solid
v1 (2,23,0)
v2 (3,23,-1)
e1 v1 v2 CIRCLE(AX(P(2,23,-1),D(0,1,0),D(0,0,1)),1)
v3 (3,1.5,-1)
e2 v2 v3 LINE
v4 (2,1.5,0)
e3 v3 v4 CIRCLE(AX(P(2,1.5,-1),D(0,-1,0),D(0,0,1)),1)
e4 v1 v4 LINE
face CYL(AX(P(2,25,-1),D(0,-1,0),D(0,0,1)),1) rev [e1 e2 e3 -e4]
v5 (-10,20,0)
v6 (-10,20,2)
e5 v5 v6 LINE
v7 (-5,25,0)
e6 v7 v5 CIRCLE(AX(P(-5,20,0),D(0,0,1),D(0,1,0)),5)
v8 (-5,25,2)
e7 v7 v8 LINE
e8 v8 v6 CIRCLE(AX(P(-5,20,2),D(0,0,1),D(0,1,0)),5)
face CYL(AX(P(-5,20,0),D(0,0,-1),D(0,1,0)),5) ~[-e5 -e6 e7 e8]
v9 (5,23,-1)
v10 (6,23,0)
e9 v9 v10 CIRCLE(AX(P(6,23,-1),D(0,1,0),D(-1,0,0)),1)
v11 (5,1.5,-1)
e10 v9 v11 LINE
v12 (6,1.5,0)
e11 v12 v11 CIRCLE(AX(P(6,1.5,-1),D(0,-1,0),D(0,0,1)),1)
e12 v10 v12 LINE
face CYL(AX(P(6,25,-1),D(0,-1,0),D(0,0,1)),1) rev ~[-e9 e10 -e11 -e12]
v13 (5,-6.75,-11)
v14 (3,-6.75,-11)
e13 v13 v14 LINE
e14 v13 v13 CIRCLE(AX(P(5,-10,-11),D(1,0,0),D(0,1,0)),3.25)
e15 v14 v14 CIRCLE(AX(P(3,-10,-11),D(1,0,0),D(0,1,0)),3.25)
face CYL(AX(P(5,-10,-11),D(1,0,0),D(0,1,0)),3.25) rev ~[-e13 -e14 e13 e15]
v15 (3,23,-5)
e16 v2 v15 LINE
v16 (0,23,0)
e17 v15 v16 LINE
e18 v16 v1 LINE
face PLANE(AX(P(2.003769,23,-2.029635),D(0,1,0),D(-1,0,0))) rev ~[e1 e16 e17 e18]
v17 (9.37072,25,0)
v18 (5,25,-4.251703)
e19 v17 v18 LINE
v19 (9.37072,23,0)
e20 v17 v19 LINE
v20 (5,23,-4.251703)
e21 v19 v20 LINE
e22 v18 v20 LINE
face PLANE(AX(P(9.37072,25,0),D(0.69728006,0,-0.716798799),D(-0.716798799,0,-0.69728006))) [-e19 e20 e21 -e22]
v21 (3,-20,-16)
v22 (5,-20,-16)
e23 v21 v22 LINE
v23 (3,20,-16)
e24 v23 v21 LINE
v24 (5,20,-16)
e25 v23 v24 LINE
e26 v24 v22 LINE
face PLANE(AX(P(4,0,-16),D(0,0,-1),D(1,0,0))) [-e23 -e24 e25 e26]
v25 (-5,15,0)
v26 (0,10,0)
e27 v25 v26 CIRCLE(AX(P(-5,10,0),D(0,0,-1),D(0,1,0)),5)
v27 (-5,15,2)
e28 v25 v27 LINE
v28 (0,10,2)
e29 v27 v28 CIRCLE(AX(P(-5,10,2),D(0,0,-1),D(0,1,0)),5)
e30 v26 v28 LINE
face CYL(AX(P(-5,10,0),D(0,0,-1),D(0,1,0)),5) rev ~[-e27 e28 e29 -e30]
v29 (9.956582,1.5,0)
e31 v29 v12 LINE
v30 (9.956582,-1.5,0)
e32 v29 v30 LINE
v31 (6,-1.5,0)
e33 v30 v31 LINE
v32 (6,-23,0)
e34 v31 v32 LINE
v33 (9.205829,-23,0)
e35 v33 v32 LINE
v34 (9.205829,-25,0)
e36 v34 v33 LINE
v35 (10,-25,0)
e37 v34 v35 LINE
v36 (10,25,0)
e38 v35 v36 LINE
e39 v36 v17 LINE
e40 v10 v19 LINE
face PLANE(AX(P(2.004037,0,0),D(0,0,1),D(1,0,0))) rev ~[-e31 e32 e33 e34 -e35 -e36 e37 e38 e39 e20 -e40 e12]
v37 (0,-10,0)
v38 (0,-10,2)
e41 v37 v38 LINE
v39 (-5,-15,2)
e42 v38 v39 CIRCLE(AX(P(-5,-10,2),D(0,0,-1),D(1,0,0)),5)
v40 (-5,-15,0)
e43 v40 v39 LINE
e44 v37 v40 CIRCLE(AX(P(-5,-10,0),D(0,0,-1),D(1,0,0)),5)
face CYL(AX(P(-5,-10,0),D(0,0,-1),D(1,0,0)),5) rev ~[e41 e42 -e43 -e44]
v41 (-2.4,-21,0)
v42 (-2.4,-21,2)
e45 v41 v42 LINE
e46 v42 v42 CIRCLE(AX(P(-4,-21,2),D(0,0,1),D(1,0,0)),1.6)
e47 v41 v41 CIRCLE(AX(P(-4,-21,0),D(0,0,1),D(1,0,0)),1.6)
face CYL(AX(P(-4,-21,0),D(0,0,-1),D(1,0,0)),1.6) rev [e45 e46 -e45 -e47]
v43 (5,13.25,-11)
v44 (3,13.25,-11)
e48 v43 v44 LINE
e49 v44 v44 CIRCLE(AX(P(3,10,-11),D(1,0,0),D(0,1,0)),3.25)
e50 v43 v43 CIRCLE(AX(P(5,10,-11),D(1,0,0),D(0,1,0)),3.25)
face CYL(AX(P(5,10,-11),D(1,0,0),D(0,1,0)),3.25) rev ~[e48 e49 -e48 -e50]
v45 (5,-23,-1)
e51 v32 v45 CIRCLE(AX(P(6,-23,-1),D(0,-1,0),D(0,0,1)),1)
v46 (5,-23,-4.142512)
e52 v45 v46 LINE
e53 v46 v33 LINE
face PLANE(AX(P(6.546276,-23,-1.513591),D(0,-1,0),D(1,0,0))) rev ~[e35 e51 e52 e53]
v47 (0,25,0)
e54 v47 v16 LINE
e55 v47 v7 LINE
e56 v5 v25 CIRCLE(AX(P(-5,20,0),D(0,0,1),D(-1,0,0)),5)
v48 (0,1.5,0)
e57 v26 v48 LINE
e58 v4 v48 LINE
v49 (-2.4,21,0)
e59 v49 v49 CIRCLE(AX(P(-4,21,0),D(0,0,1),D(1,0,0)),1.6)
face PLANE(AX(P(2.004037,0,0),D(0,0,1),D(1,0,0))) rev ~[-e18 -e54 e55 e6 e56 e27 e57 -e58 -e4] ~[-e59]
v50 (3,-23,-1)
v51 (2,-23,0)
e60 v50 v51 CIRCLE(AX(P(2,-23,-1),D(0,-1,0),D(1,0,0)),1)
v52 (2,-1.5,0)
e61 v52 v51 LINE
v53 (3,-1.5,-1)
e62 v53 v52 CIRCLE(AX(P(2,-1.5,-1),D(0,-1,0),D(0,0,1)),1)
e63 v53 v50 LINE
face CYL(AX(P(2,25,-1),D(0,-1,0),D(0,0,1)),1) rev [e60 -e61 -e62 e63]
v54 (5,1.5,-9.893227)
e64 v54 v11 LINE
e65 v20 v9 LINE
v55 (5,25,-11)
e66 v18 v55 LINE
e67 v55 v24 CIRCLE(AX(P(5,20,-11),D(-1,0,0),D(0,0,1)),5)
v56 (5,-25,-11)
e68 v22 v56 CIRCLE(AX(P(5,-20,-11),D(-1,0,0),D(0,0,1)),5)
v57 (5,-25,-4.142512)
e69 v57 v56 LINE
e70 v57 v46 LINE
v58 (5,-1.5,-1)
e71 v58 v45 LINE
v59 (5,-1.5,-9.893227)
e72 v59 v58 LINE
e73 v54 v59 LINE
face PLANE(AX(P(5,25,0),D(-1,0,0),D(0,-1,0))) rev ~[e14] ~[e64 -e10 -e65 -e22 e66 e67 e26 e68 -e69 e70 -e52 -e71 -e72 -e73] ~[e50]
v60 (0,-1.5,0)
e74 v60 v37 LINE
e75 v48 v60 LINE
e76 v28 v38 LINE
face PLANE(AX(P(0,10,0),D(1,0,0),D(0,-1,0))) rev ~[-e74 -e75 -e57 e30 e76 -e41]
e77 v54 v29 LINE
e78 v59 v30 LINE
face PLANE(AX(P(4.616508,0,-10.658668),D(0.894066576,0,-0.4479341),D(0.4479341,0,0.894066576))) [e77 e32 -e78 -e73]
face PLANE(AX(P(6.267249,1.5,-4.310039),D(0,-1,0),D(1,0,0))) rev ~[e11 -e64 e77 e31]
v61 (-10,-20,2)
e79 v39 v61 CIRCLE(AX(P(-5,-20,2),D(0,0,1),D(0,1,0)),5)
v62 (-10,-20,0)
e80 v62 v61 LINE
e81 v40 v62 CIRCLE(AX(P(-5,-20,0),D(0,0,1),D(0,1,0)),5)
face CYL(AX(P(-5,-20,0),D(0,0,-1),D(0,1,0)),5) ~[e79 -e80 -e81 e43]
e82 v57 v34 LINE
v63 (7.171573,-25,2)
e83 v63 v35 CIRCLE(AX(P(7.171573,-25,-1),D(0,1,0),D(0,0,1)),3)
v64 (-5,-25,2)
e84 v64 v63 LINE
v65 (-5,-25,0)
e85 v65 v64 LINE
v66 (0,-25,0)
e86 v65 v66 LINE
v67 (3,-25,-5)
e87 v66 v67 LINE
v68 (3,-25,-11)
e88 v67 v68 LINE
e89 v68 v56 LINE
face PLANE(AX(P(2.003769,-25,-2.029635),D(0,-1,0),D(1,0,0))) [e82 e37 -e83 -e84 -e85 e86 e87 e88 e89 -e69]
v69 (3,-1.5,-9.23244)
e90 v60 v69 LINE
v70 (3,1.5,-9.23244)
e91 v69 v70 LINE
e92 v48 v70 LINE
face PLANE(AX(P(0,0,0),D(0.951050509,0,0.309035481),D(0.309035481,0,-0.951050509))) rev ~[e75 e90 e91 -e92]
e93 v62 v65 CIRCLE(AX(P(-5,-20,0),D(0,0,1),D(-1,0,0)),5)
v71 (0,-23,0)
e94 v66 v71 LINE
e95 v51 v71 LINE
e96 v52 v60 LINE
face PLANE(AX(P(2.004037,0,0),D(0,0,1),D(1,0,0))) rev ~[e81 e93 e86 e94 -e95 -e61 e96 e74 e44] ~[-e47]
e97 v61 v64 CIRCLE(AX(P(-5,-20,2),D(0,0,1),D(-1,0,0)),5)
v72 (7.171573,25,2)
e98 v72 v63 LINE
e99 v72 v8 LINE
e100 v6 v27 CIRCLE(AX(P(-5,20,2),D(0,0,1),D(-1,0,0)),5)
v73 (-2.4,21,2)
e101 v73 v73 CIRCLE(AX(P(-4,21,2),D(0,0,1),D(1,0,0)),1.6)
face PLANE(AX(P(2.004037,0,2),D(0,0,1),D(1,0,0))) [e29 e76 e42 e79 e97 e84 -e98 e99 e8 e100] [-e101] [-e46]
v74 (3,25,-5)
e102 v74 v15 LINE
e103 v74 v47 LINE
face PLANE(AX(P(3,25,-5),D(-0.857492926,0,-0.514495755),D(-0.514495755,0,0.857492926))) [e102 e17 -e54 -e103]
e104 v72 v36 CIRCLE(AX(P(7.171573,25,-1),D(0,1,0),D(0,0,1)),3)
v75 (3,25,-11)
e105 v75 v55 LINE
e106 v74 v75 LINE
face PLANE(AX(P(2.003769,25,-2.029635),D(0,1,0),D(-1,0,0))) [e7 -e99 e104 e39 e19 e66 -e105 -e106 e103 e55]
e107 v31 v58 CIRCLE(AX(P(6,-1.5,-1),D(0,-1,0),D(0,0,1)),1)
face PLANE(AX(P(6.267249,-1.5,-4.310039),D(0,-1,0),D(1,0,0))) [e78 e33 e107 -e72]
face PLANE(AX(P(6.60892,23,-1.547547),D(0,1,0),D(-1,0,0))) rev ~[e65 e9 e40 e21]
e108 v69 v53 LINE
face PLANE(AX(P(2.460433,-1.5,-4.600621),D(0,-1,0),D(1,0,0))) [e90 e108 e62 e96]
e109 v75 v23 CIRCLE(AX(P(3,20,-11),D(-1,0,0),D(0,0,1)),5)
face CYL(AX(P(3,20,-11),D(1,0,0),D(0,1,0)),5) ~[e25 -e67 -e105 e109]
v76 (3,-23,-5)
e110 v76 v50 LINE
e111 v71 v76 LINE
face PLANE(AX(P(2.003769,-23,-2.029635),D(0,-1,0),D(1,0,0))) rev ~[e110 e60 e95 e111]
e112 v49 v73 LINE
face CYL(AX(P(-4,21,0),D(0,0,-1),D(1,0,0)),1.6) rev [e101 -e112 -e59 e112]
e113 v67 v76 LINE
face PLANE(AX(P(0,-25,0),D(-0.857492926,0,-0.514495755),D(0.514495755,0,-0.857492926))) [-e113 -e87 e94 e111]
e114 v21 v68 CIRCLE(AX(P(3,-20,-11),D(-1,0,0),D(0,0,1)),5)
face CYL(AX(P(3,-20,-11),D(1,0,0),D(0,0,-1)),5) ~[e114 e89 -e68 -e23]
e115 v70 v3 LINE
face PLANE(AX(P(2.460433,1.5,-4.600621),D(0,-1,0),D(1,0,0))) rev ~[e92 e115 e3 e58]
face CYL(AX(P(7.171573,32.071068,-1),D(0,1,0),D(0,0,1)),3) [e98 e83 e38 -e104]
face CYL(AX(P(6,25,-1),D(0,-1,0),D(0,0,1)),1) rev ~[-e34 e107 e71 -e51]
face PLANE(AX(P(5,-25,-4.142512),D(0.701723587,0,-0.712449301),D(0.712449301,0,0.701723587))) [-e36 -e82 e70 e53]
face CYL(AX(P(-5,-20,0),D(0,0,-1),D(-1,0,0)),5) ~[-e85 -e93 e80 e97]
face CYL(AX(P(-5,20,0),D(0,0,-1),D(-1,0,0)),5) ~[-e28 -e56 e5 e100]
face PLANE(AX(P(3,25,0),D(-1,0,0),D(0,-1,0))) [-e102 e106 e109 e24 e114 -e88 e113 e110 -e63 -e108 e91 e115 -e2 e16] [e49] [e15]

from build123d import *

# Parameters (mm, degrees)
F0_R        = 1.6
F1_DEPTH    = 2
F2_W        = 2
F2_H        = 50
F3_DEPTH    = 16
F4_R        = 1
F5_T1_DEPTH = 64.1421356237
F6_R        = 3.25
F7_DEPTH    = 25
F8_R        = 5
F10_DEPTH   = 1.5
F12_DEPTH   = 2
F14_DEPTH   = 2


# Not quite as in the source:
# - a fillet or chamfer that OpenCascade refuses, or shapes differently, is made with other operations: its cross-section is extruded or revolved along the edge and cut away or added
# - a feature names something its author has since deleted; it is built from what else it names


with BuildPart() as f1:
    # F0 (on Top) → F1 (new body)
    with BuildSketch(Plane.XY):
        with BuildLine():
            Line((10, 25), (-5, 25))
            ThreePointArc((-5, 25), (-8.5355339059, 23.5355339059), (-10, 20))
            ThreePointArc((-10, 20), (-8.5355339059, 16.4644660941), (-5, 15))
            ThreePointArc((-5, 15), (-1.4644660941, 13.5355339059), (0, 10))
            Line((0, 10), (0, -10))
            ThreePointArc((0, -10), (-1.4644660941, -13.5355339059), (-5, -15))
            ThreePointArc((-5, -15), (-8.5355339059, -16.4644660941), (-10, -20))
            ThreePointArc((-10, -20), (-8.5355339059, -23.5355339059), (-5, -25))
            Line((-5, -25), (10, -25))
            Line((10, -25), (10, 25))
        make_face()
        with Locations((-4, -21)):
            Circle(F0_R, mode=Mode.SUBTRACT)
        with Locations((-4, 21)):
            Circle(F0_R, mode=Mode.SUBTRACT)
    extrude(amount=F1_DEPTH)

    # F2 (on face) → F3 (join)
    with BuildSketch(Plane(origin=(0, 0, 0), x_dir=(1, 0, 0), z_dir=(0, 0, -1))):
        with Locations((4, 0)):
            Rectangle(F2_W, F2_H)
    extrude(amount=F3_DEPTH)

    # F4
    f4_edges = [f1.edges().sort_by_distance(p)[0] for p in [
        (3, 0, 0),
        (5, 0, 0),
    ]]
    fillet(f4_edges, radius=F4_R)

    # F5: fillet of radius 3 on 1 edges, made by hand

    # F5_s2 → F5_t1 (cut)
    with BuildSketch(Plane.XZ.offset(-32.0710678119)):
        with BuildLine():
            ThreePointArc((7.1715728753, 2), (8.9036236828, 1.4494897428), (10, 0))
            Line((10, 0), (10, 2))
            Line((10, 2), (7.1715728753, 2))
        make_face()
    extrude(amount=F5_T1_DEPTH, mode=Mode.SUBTRACT)

    # F6 (on face) → F7 (cut)
    with BuildSketch(Plane.YZ.offset(5)):
        with Locations((-10, -11)):
            Circle(F6_R)
        with Locations((10, -11)):
            Circle(F6_R)
    extrude(amount=-F7_DEPTH, mode=Mode.SUBTRACT)

    # F8
    f8_edges = [f1.edges().sort_by_distance(p)[0] for p in [
        (4, -25, -16),
        (4, 25, -16),
    ]]
    fillet(f8_edges, radius=F8_R)

    # F9 (on Front) → F10 (join, symmetric)
    with BuildSketch(Plane.XZ):
        Polygon((3.4634403419, 0), (0, 0), (3.4634403419, -10.6586683542), align=None)
        Polygon((4.6165082604, -10.6586683542), (9.9565815181, 0), (4.6165082604, 0), align=None)
    extrude(amount=F10_DEPTH, both=True)

    # F11 (on face) → F12 (join)
    with BuildSketch(Plane(origin=(0, 25, 0), x_dir=(-1, 0, 0), z_dir=(0, 1, 0))):
        with BuildLine():
            Line((-3, -5), (0, 0))
            Line((0, 0), (-2, 0))
            ThreePointArc((-2, 0), (-2.7071067812, -0.2928932188), (-3, -1))
            Line((-3, -1), (-3, -5))
        make_face()
        with BuildLine():
            Line((-9.370720014, 0), (-5, -4.2517034346))
            Line((-5, -4.2517034346), (-5, -1))
            ThreePointArc((-5, -1), (-5.2928932188, -0.2928932188), (-6, 0))
            Line((-6, 0), (-9.370720014, 0))
        make_face()
    extrude(amount=-F12_DEPTH)

    # F13 (on face) → F14 (join)
    with BuildSketch(Plane.XZ.offset(25)):
        with BuildLine():
            Line((0, 0), (3, -5))
            Line((3, -5), (3, -1))
            ThreePointArc((3, -1), (2.7071067812, -0.2928932188), (2, 0))
            Line((2, 0), (0, 0))
        make_face()
        with BuildLine():
            Line((5, -1), (5, -4.1425118317))
            Line((5, -4.1425118317), (9.2058293521, 0))
            Line((9.2058293521, 0), (6, 0))
            ThreePointArc((6, 0), (5.2928932188, -0.2928932188), (5, -1))
        make_face()
    extrude(amount=-F14_DEPTH)


solid = f1.part
